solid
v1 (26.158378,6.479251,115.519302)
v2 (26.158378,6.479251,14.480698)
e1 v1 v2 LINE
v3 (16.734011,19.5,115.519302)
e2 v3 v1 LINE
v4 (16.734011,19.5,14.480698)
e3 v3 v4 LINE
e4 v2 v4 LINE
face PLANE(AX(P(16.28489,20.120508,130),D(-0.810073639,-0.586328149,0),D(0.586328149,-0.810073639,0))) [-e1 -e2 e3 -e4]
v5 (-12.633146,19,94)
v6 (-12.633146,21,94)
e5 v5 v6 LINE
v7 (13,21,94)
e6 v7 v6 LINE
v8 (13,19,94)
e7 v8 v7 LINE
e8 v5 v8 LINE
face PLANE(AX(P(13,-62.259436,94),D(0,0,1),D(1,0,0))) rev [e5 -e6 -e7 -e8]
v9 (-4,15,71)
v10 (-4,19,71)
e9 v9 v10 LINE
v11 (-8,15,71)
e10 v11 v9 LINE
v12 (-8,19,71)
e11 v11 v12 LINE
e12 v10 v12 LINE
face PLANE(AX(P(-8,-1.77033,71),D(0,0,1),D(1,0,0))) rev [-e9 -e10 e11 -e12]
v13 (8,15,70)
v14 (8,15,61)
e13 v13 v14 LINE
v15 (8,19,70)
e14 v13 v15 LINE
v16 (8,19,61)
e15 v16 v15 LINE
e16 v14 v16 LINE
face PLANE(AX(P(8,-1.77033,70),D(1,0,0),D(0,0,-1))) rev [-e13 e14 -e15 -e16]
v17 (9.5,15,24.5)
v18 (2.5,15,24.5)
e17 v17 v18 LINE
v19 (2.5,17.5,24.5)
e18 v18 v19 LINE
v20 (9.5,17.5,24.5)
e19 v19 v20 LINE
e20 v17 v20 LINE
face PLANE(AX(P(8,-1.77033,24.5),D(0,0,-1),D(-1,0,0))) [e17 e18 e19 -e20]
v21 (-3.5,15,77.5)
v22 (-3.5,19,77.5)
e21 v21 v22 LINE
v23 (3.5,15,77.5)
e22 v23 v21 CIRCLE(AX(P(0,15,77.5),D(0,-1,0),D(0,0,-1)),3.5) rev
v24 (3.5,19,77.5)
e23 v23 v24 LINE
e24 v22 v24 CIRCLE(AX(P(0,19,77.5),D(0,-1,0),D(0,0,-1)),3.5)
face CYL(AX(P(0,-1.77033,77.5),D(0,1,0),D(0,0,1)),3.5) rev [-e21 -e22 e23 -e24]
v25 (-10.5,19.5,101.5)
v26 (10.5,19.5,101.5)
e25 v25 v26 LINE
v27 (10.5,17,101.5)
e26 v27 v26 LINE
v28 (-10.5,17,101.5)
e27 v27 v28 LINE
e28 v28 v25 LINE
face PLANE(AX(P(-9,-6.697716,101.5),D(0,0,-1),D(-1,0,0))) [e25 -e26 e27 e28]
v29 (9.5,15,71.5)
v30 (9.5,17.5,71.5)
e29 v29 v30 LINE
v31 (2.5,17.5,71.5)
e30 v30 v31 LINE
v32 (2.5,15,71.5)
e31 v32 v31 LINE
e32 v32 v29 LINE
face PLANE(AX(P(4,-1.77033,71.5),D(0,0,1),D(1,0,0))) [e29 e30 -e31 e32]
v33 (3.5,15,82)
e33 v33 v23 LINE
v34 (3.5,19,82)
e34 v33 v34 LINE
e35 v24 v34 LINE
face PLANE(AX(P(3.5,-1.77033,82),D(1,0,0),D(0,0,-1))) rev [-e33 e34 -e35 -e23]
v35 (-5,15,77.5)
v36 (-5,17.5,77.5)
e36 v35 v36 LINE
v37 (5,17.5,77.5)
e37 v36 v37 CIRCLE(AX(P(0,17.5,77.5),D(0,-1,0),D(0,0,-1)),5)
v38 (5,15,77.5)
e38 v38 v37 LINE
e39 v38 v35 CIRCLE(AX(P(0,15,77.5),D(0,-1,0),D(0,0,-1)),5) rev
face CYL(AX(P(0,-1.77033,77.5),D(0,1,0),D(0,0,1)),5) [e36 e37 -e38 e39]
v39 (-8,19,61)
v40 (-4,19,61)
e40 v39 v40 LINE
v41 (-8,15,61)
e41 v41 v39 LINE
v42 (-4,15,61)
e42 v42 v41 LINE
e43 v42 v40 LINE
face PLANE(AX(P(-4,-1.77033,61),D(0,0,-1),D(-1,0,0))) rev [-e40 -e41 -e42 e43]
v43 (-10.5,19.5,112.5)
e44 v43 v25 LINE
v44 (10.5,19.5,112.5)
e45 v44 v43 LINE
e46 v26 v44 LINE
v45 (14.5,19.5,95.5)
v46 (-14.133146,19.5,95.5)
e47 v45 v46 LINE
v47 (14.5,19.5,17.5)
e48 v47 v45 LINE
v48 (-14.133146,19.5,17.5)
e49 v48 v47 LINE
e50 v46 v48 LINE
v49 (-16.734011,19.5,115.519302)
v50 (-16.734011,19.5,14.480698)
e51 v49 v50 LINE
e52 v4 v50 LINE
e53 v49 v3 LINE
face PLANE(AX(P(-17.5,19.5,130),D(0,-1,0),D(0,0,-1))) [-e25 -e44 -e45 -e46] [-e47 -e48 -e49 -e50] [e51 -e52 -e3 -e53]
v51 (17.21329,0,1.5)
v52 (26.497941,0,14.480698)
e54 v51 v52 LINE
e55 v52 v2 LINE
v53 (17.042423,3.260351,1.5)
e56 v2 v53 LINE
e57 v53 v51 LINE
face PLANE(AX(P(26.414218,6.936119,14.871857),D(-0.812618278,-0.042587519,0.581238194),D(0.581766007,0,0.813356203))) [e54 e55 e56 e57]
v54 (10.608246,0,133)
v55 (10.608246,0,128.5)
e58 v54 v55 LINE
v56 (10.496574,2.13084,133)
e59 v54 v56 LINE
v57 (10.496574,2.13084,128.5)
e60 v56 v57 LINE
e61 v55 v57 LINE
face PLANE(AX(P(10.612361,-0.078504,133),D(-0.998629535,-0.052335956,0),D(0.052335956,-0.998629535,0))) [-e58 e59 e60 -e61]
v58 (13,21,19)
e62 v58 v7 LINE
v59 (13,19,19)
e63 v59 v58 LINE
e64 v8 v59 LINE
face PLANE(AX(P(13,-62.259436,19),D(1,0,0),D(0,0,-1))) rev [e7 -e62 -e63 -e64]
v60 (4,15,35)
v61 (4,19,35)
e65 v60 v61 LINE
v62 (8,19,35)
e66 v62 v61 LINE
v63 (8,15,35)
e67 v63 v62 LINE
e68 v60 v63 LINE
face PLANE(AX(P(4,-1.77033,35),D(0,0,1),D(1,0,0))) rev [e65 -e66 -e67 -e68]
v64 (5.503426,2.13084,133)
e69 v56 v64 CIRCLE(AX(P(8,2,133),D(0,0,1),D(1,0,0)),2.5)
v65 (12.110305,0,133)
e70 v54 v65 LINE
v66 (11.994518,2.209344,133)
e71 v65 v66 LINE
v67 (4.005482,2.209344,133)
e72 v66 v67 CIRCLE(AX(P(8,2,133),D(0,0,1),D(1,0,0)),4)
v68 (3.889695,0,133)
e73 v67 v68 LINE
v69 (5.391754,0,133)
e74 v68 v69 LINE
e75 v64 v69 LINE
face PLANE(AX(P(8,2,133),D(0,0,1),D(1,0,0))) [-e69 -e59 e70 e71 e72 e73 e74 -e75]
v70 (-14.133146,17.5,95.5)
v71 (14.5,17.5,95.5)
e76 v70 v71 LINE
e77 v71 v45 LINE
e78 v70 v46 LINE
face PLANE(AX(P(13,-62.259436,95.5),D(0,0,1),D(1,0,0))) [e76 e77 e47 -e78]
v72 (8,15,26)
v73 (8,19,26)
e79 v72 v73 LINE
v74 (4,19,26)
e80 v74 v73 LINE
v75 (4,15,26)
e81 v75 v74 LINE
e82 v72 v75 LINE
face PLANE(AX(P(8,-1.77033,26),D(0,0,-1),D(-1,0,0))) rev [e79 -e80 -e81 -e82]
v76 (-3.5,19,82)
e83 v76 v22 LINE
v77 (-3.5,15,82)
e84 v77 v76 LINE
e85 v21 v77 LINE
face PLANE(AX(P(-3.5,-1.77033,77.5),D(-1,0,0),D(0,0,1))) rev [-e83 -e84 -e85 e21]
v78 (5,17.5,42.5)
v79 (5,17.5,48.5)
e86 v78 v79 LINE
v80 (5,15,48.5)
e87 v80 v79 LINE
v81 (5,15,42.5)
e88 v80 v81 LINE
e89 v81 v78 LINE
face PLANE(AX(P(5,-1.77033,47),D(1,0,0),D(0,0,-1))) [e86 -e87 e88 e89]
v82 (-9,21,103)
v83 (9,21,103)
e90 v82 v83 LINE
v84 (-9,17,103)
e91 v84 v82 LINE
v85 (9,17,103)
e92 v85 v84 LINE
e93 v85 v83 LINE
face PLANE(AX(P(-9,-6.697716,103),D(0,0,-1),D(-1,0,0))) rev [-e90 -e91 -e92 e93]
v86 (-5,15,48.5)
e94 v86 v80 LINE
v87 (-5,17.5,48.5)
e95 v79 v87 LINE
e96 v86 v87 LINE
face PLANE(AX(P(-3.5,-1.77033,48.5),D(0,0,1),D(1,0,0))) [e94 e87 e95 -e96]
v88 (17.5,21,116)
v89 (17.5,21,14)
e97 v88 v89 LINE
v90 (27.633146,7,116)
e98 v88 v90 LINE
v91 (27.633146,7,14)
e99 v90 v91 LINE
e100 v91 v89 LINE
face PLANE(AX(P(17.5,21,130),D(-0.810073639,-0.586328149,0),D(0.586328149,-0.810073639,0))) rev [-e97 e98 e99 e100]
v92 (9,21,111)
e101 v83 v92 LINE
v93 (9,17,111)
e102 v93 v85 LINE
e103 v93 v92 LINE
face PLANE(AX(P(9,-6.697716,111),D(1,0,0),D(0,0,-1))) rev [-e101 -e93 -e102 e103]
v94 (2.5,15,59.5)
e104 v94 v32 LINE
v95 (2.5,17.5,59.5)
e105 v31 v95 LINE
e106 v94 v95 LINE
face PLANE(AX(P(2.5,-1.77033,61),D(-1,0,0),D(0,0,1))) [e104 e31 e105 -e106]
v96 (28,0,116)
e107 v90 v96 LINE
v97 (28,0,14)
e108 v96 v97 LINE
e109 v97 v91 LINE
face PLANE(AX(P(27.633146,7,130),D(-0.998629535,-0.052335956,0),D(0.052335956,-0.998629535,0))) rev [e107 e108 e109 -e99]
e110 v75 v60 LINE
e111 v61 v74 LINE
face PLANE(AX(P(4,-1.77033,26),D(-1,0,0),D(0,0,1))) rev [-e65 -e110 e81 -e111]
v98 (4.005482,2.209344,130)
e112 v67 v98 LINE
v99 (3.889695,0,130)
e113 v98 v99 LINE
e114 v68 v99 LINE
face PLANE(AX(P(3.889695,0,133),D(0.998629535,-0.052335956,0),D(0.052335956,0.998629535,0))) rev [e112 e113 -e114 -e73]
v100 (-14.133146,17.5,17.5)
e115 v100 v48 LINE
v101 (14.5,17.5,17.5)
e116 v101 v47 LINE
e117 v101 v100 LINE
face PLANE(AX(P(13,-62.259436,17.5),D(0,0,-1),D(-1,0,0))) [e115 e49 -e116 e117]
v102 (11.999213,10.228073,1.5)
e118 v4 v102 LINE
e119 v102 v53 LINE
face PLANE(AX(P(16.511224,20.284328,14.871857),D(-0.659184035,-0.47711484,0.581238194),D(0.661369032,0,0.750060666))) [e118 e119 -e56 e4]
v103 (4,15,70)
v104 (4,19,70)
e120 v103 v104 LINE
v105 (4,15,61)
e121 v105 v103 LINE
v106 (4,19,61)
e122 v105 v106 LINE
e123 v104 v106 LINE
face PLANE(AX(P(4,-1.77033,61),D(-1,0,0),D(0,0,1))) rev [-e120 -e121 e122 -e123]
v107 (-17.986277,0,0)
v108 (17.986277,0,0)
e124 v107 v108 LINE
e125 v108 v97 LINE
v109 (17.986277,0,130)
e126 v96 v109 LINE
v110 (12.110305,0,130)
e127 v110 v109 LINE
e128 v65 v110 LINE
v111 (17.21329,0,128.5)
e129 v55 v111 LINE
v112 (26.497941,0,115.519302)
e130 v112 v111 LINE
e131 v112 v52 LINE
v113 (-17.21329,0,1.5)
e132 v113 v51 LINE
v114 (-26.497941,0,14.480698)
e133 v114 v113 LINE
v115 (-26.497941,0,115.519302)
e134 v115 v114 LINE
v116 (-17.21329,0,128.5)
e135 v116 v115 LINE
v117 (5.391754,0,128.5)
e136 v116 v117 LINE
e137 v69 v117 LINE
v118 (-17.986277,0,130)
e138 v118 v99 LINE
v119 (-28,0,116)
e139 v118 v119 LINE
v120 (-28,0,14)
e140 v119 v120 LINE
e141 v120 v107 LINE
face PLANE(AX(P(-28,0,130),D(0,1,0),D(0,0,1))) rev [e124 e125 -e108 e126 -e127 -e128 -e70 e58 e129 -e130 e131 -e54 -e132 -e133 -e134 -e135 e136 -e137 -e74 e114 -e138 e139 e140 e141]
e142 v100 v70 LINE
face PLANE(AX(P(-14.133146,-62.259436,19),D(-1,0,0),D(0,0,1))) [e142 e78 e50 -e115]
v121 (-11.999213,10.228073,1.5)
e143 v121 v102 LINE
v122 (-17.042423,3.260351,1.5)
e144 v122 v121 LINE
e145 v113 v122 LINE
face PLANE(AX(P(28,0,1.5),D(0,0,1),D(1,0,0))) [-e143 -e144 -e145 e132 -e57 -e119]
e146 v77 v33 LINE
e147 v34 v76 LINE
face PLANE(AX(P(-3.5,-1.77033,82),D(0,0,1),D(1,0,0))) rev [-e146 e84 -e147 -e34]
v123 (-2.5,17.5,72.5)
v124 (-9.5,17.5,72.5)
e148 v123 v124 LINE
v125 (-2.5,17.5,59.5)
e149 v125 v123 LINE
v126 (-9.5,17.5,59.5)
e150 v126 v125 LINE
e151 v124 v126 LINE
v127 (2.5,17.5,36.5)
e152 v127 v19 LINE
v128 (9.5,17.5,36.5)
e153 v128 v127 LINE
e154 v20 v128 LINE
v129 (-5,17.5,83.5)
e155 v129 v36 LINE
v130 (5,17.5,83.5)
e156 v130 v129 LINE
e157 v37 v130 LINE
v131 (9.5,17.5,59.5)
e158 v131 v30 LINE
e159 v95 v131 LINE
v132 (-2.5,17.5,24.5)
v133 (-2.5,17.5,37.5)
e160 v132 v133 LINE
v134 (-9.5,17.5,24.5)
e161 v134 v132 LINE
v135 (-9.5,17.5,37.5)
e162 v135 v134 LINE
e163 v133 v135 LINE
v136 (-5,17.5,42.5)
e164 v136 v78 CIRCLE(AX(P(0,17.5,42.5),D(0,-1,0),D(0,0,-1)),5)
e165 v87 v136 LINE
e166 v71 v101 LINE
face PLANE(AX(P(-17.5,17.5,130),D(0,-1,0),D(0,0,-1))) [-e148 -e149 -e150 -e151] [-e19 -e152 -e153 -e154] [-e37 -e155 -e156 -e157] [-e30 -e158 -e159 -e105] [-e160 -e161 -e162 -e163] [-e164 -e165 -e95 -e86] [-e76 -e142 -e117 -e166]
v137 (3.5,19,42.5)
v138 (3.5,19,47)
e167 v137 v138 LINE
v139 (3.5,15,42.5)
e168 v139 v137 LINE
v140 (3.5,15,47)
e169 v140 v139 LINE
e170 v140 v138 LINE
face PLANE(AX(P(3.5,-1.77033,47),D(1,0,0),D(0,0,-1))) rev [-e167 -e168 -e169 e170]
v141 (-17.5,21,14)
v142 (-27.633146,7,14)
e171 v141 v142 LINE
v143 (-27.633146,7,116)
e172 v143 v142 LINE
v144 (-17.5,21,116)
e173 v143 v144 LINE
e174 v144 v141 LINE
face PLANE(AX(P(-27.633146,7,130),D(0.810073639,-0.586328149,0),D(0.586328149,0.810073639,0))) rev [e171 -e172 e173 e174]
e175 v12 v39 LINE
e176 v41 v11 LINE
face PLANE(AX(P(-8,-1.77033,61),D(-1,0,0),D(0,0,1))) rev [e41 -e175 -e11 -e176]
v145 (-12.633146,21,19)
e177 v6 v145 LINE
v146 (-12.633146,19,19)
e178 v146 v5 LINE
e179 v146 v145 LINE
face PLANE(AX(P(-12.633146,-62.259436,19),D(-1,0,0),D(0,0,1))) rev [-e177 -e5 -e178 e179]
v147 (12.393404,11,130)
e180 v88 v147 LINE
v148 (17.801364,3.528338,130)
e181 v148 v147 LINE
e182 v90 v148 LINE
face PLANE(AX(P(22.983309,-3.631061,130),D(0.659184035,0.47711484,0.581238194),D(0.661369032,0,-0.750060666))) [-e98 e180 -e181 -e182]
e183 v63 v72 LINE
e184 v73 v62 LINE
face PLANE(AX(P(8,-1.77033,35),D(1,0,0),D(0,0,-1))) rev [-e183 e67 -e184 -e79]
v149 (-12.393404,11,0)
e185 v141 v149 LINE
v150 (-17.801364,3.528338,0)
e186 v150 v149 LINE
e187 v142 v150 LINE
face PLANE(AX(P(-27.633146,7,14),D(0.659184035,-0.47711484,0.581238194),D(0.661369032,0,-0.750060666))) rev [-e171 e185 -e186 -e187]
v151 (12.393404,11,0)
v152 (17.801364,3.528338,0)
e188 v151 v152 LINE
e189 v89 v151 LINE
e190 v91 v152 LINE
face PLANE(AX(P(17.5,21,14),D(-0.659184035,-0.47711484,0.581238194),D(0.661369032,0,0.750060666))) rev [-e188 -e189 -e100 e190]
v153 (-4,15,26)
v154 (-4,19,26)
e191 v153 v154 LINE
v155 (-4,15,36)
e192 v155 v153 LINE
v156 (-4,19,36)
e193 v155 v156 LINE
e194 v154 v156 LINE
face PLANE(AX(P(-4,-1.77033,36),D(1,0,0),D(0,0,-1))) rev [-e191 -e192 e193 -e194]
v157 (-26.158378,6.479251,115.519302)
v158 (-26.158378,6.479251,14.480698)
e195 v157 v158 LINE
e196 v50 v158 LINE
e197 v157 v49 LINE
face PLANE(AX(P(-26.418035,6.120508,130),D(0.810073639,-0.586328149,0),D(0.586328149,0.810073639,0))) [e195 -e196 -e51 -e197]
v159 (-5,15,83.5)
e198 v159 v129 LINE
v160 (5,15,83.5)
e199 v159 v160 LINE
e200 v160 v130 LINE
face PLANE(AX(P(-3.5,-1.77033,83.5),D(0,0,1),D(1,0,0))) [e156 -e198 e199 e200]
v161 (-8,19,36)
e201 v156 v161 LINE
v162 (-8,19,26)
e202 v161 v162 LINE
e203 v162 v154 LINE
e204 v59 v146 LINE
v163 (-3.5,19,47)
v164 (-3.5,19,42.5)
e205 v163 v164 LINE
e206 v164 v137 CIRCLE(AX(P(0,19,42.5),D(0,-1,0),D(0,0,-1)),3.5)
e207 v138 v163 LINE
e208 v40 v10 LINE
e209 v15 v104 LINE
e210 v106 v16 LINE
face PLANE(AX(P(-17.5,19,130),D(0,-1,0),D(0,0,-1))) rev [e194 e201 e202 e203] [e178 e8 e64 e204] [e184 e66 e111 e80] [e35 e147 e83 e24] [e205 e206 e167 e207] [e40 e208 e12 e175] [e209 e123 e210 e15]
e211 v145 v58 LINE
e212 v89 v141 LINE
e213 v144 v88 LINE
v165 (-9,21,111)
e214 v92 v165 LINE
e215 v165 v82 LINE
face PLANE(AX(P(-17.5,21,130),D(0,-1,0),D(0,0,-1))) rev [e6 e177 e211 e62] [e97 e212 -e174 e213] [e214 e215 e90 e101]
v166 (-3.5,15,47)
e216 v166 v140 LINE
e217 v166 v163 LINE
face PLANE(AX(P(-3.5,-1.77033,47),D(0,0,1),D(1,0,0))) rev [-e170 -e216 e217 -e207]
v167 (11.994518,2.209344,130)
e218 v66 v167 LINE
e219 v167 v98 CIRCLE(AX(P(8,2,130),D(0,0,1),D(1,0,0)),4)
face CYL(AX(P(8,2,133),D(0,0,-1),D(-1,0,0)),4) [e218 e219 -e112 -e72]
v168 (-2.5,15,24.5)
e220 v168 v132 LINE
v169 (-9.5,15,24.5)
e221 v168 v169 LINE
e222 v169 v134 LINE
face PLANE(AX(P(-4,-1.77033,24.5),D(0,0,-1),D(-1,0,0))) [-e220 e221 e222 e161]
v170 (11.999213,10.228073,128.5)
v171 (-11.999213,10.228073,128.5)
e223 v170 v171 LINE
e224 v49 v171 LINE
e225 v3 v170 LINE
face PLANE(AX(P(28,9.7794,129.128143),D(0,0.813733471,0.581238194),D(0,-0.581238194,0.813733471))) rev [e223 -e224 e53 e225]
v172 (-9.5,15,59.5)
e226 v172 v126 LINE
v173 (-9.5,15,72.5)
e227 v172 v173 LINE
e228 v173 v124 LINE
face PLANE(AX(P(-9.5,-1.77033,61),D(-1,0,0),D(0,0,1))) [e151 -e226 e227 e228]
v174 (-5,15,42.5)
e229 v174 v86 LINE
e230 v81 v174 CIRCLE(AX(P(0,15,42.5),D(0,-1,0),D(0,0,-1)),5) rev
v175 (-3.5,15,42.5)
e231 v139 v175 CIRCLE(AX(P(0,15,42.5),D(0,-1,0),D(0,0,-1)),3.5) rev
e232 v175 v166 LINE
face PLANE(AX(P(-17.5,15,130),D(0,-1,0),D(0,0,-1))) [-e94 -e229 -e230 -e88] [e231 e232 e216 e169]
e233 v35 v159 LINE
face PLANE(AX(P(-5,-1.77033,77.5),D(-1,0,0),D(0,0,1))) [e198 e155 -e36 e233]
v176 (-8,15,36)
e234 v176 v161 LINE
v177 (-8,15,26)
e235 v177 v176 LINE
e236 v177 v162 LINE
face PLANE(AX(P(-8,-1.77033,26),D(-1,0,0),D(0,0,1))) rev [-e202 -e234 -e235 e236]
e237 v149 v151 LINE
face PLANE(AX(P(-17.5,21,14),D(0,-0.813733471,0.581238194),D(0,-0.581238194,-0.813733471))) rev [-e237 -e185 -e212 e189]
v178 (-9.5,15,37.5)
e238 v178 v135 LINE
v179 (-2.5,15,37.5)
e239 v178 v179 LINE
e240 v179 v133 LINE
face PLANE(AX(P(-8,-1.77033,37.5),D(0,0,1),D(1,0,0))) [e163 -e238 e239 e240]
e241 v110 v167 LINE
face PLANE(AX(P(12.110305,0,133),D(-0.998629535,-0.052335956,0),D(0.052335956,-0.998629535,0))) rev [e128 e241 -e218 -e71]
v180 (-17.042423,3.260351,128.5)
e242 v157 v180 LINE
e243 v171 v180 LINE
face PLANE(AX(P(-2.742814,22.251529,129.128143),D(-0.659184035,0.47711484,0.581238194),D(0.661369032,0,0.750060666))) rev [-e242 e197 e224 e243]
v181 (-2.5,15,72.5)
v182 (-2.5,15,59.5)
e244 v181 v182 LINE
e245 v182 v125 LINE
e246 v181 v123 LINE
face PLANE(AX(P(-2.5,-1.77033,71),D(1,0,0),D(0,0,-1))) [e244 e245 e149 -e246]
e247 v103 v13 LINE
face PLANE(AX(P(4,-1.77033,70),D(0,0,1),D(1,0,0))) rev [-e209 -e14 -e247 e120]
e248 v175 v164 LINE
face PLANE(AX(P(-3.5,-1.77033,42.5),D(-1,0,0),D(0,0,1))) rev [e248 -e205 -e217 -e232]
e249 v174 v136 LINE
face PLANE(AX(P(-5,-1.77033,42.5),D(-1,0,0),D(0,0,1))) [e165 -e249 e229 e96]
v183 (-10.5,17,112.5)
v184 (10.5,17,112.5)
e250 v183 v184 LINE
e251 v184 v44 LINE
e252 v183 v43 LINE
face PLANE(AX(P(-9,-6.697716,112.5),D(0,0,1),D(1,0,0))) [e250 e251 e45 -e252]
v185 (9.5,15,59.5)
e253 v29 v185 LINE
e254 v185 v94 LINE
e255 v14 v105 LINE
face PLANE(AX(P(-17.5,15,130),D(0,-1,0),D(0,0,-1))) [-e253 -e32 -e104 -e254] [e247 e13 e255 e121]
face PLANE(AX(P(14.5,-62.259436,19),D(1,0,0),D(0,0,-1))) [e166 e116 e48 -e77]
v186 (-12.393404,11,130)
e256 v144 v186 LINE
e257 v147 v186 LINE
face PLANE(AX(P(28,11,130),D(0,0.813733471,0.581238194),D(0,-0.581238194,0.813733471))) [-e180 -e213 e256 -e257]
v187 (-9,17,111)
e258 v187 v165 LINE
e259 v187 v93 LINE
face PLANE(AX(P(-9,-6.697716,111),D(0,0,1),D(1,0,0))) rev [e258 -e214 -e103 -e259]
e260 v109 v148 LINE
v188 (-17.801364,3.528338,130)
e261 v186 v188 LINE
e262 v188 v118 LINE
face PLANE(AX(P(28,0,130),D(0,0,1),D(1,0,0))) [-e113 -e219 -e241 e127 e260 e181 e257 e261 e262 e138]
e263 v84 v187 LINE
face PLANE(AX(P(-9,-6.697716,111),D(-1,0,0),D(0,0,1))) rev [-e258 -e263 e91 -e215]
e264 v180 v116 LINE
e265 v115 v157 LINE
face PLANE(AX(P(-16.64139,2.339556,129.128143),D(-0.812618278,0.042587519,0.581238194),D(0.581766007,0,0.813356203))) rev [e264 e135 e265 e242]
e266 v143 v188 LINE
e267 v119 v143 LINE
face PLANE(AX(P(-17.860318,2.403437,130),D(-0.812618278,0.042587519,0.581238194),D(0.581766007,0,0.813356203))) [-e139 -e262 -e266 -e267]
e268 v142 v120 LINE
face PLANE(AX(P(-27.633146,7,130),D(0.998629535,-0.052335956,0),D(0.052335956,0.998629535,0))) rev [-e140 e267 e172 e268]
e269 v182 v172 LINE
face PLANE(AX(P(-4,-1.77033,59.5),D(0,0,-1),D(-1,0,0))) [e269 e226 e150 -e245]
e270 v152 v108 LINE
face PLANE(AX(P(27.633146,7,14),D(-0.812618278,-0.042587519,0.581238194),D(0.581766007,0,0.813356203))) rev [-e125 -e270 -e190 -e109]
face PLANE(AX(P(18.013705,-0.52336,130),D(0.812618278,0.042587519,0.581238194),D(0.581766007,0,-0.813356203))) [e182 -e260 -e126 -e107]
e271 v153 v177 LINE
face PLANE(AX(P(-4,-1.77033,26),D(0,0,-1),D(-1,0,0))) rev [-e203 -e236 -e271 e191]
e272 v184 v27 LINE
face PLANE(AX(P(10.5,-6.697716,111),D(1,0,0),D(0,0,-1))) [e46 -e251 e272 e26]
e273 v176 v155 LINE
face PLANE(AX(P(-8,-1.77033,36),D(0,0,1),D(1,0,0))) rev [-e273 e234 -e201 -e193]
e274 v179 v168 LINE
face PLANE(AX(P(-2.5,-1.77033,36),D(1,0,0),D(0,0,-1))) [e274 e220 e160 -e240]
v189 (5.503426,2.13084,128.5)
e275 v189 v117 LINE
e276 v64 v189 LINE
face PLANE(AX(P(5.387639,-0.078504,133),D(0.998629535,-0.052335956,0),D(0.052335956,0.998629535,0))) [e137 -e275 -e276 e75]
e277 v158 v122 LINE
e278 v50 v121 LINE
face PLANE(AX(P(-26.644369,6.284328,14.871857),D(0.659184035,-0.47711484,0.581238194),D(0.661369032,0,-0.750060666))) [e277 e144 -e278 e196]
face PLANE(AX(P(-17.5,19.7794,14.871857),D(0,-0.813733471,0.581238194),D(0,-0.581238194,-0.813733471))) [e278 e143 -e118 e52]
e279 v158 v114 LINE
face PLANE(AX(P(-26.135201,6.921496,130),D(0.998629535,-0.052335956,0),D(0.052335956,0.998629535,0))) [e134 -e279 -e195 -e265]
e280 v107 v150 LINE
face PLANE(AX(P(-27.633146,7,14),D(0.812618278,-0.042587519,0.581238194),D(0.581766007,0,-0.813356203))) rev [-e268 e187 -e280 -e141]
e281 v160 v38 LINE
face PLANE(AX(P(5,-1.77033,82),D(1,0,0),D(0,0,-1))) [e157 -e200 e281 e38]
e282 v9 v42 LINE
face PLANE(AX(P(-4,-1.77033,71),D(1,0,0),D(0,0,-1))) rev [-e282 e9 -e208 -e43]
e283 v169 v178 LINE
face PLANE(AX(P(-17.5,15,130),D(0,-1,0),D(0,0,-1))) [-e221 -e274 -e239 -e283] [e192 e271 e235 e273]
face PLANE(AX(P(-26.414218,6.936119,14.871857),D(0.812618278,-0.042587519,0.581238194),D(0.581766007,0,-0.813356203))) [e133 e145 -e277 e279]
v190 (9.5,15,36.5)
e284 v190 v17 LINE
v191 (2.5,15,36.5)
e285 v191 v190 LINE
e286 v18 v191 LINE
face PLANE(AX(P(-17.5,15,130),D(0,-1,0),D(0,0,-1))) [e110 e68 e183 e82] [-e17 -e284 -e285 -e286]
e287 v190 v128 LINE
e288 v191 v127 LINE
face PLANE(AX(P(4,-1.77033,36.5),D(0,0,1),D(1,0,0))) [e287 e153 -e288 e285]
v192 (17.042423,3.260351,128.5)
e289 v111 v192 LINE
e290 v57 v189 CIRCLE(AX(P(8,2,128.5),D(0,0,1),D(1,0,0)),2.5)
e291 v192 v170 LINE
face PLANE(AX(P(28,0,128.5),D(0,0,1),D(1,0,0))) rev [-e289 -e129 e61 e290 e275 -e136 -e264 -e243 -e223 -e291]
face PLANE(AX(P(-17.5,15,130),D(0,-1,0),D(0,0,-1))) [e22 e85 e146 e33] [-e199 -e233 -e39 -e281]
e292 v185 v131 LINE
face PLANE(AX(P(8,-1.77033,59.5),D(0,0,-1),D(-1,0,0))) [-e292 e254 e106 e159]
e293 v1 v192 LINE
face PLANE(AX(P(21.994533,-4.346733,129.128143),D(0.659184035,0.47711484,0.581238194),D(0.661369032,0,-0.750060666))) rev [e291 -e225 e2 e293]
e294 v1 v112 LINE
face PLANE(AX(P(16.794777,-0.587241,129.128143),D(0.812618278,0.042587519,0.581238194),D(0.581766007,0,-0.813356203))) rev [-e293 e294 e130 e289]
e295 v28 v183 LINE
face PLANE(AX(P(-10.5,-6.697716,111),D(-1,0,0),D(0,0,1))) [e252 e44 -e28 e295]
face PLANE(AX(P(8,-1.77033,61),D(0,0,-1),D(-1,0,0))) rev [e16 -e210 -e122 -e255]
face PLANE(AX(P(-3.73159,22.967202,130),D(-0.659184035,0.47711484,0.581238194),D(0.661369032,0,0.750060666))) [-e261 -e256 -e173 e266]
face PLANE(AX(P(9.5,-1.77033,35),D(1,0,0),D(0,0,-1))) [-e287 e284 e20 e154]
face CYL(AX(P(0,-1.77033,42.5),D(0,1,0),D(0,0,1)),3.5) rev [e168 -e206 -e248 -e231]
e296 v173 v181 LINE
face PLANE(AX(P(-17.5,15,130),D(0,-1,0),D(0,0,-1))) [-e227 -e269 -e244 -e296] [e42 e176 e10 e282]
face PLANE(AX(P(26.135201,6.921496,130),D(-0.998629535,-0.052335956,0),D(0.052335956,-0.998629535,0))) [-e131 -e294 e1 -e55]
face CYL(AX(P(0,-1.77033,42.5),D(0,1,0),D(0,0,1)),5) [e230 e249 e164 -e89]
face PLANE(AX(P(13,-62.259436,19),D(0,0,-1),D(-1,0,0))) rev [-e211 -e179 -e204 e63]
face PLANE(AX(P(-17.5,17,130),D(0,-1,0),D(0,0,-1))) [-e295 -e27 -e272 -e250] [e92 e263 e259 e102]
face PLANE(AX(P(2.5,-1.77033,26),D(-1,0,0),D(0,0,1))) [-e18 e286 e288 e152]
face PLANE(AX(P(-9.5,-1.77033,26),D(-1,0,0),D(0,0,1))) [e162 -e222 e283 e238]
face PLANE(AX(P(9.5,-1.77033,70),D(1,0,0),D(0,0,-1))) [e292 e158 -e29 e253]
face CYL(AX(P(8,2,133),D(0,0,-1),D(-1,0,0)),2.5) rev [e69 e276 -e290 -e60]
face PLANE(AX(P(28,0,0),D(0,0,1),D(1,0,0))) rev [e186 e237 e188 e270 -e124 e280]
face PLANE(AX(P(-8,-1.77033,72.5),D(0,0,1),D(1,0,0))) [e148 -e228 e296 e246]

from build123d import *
from OCP.BRepFilletAPI import BRepFilletAPI_MakeChamfer

# Parameters (mm, degrees)
EXTRUDE1_DEPTH       = 130
CHAMFER1_SIZE        = 14
CHAMFER1_SIZE2       = 10
CHAMFER2_SIZE        = 10
CHAMFER2_SIZE2       = 14
EXTRUDE2_DEPTH       = 3
SKETCH3_W            = 25.633145545
SKETCH3_H            = 75
CUT_EXTRUDE1_DEPTH   = 11
SKETCH4_W            = 4
SKETCH4_H            = 9
SKETCH4_H_2          = 10
CUT_EXTRUDE2_DEPTH   = 15
LPATTERN1_COUNT      = 2
LPATTERN1_PITCH      = 35
SKETCH5_W            = 18
SKETCH5_H            = 8
CUT_EXTRUDE3_DEPTH   = 13
SHELL1_OUTLINE_W     = 28.633145545
SHELL1_OUTLINE_H     = 78
SHELL1_OUTLINE_W_2   = 21
SHELL1_OUTLINE_H_2   = 11
SHELL1_DEPTH         = 15
SHELL1_START         = 15
SHELL1_2_OUTLINE_W   = 28.633145545
SHELL1_2_OUTLINE_H   = 78
SHELL1_2_OUTLINE_W_2 = 7
SHELL1_2_OUTLINE_H_2 = 13
SHELL1_2_OUTLINE_H_3 = 12
SHELL1_2_DEPTH       = 2.5
SHELL1_3_OUTLINE_W   = 21
SHELL1_3_OUTLINE_H   = 11
SHELL1_3_DEPTH       = 2
SHELL1_START_2       = 14.48069758
SHELL1_4_DEPTH       = 101.03860484
SHELL1_START_3       = 95.5
SHELL1_5_DEPTH       = 6
SHELL1_START_4       = 101.5
SHELL1_6_OUTLINE_W   = 3.633145545
SHELL1_6_OUTLINE_H   = 19.5
SHELL1_6_DEPTH       = 14.01930242
SHELL1_7_DEPTH       = 3.01930242
SHELL1_START_5       = 112.5
SHELL1_8_DEPTH       = 3.01930242
SHELL1_START_6       = 1.5
SHELL1_9_DEPTH       = 131.5


with BuildPart() as part:
    # Sketch1 → Extrude1 (new body)
    with BuildSketch(Plane.XY):
        Polygon((17.5, 21), (27.633145545, 7), (28, 0), (-28, 0), (-27.633145545, 7), (-17.5, 21), align=None)
    extrude(amount=EXTRUDE1_DEPTH)

    # Chamfer1: one chamfer whose edges measure the first distance from different faces: ONE call of the kernel's chamfer builder (chamfer() names one face for all edges)
    chamfer1_edges_1 = [part.edges().sort_by_distance(p)[0] for p in [
        (0, 21, 130),
    ]]
    chamfer1_side_1 = [part.faces().sort_by_distance(p)[0] for p in [
        (0, 21, 65),
    ]]
    chamfer1_edges_2 = [part.edges().sort_by_distance(p)[0] for p in [
        (-22.566572773, 14, 130),
    ]]
    chamfer1_side_2 = [part.faces().sort_by_distance(p)[0] for p in [
        (-22.566572773, 14, 65),
    ]]
    chamfer1_edges_3 = [part.edges().sort_by_distance(p)[0] for p in [
        (-27.816572773, 3.5, 130),
    ]]
    chamfer1_side_3 = [part.faces().sort_by_distance(p)[0] for p in [
        (-27.816572773, 3.5, 65),
    ]]
    chamfer1_edges_4 = [part.edges().sort_by_distance(p)[0] for p in [
        (27.816572773, 3.5, 130),
    ]]
    chamfer1_side_4 = [part.faces().sort_by_distance(p)[0] for p in [
        (27.816572773, 3.5, 65),
    ]]
    chamfer1_edges_5 = [part.edges().sort_by_distance(p)[0] for p in [
        (22.566572773, 14, 130),
    ]]
    chamfer1_side_5 = [part.faces().sort_by_distance(p)[0] for p in [
        (22.566572773, 14, 65),
    ]]
    chamfer1 = BRepFilletAPI_MakeChamfer(part.part.solid().wrapped)
    for e in chamfer1_edges_1:
        chamfer1.Add(CHAMFER1_SIZE, CHAMFER1_SIZE2, e.wrapped, chamfer1_side_1[0].wrapped)  # the first distance lies on this face
    for e in chamfer1_edges_2:
        chamfer1.Add(CHAMFER1_SIZE, CHAMFER1_SIZE2, e.wrapped, chamfer1_side_2[0].wrapped)  # the first distance lies on this face
    for e in chamfer1_edges_3:
        chamfer1.Add(CHAMFER1_SIZE, CHAMFER1_SIZE2, e.wrapped, chamfer1_side_3[0].wrapped)  # the first distance lies on this face
    for e in chamfer1_edges_4:
        chamfer1.Add(CHAMFER1_SIZE, CHAMFER1_SIZE2, e.wrapped, chamfer1_side_4[0].wrapped)  # the first distance lies on this face
    for e in chamfer1_edges_5:
        chamfer1.Add(CHAMFER1_SIZE, CHAMFER1_SIZE2, e.wrapped, chamfer1_side_5[0].wrapped)  # the first distance lies on this face
    add(Compound.cast(chamfer1.Shape()), mode=Mode.REPLACE)

    # Chamfer2
    chamfer2_edges = [part.edges().sort_by_distance(p)[0] for p in [
        (-27.816572773, 3.5, 0),
        (-22.566572773, 14, 0),
        (0, 21, 0),
        (22.566572773, 14, 0),
        (27.816572773, 3.5, 0),
    ]]
    chamfer2_side = [part.faces().sort_by_distance(p)[0] for p in [
        (0, 9.6691811, 0),
    ]]
    chamfer(chamfer2_edges, length=CHAMFER2_SIZE, length2=CHAMFER2_SIZE2, reference=chamfer2_side[0])

    # Sketch2 → Extrude2 (add)
    with BuildSketch(Plane(origin=(5.745184329, -1.894827458, 130), x_dir=(1, 0, 0), z_dir=(0, 0, 1))):
        with BuildLine():
            Line((-1.855489271, 1.894827458), (6.365120614, 1.894827458))
            Line((6.365120614, 1.894827458), (6.24933381, 4.104171283))
            ThreePointArc((6.24933381, 4.104171283), (2.254815671, 7.894827458), (-1.739702468, 4.104171283))
            Line((-1.739702468, 4.104171283), (-1.855489271, 1.894827458))
        make_face()
    extrude(amount=EXTRUDE2_DEPTH)

    # Sketch3 → Cut-Extrude1 (cut)
    with BuildSketch(Plane(origin=(3.492514123, 30, 107.578199621), x_dir=(1, 0, 0), z_dir=(0, 1, 0))):
        with Locations((-3.309086896, 51.078199621)):
            Rectangle(SKETCH3_W, SKETCH3_H)
    extrude(amount=-CUT_EXTRUDE1_DEPTH, mode=Mode.SUBTRACT)

    # Sketch4 → Cut-Extrude2 (cut)
    with BuildSketch(Plane(origin=(-3.08260661, 30, 40.468913064), x_dir=(-1, 0, 0), z_dir=(0, 1, 0))):
        with Locations((-9.08260661, -9.968913064)):
            Rectangle(SKETCH4_W, SKETCH4_H)
        with Locations((2.91739339, -9.468913064)):
            Rectangle(SKETCH4_W, SKETCH4_H_2)
        with BuildLine():
            Line((-6.58260661, 6.531086936), (-6.58260661, 2.031086936))
            ThreePointArc((-6.58260661, 2.031086936), (-3.08260661, -1.468913064), (0.41739339, 2.031086936))
            Line((0.41739339, 2.031086936), (0.41739339, 6.531086936))
            Line((0.41739339, 6.531086936), (-6.58260661, 6.531086936))
        make_face()
    cut_extrude2 = extrude(amount=-CUT_EXTRUDE2_DEPTH, mode=Mode.SUBTRACT)

    # LPattern1: Cut-Extrude2 ×2
    with Locations(*[(0, 0, i * LPATTERN1_PITCH) for i in range(1, LPATTERN1_COUNT)]):
        add(cut_extrude2, mode=Mode.SUBTRACT)

    # Sketch5 → Cut-Extrude3 (cut)
    with BuildSketch(Plane(origin=(0.792567218, 30, 213.513140982), x_dir=(1, 0, 0), z_dir=(0, 1, 0))):
        with Locations((-0.792567218, 106.513140982)):
            Rectangle(SKETCH5_W, SKETCH5_H)
    extrude(amount=-CUT_EXTRUDE3_DEPTH, mode=Mode.SUBTRACT)

    # Shell1: read off the stored shape, not the designer's step
    # Shell1 outline → Shell1 (cut)
    with BuildSketch(Plane(origin=(0, 0, 0), x_dir=(1, 0, 0), z_dir=(0, 1, 0))):
        with Locations((0.183427228, -56.5)):
            Rectangle(SHELL1_OUTLINE_W, SHELL1_OUTLINE_H)
        with Locations((0, -107)):
            Rectangle(SHELL1_OUTLINE_W_2, SHELL1_OUTLINE_H_2)
    extrude(amount=SHELL1_DEPTH, mode=Mode.SUBTRACT)

    # Shell1 2 outline → Shell1 2 (cut)
    with BuildSketch(Plane(origin=(0, 0, 0), x_dir=(1, 0, 0), z_dir=(0, 1, 0)).offset(SHELL1_START)):
        with Locations((0.183427228, -56.5)):
            Rectangle(SHELL1_2_OUTLINE_W, SHELL1_2_OUTLINE_H)
        with BuildLine():
            Line((-5, -83.5), (-5, -77.5))
            ThreePointArc((-5, -77.5), (0, -72.5), (5, -77.5))
            Line((5, -77.5), (5, -83.5))
            Line((5, -83.5), (-5, -83.5))
        make_face(mode=Mode.SUBTRACT)
        with Locations((-6, -66)):
            Rectangle(SHELL1_2_OUTLINE_W_2, SHELL1_2_OUTLINE_H_2, mode=Mode.SUBTRACT)
        with Locations((6, -65.5)):
            Rectangle(SHELL1_2_OUTLINE_W_2, SHELL1_2_OUTLINE_H_3, mode=Mode.SUBTRACT)
        with BuildLine():
            Line((-5, -48.5), (-5, -42.5))
            ThreePointArc((-5, -42.5), (0, -37.5), (5, -42.5))
            Line((5, -42.5), (5, -48.5))
            Line((5, -48.5), (-5, -48.5))
        make_face(mode=Mode.SUBTRACT)
        with Locations((-6, -31)):
            Rectangle(SHELL1_2_OUTLINE_W_2, SHELL1_2_OUTLINE_H_2, mode=Mode.SUBTRACT)
        with Locations((6, -30.5)):
            Rectangle(SHELL1_2_OUTLINE_W_2, SHELL1_2_OUTLINE_H_3, mode=Mode.SUBTRACT)
    extrude(amount=SHELL1_2_DEPTH, mode=Mode.SUBTRACT)

    # Shell1 3 outline → Shell1 3 (cut)
    with BuildSketch(Plane(origin=(0, 0, 0), x_dir=(1, 0, 0), z_dir=(0, 1, 0)).offset(SHELL1_START)):
        with Locations((0, -107)):
            Rectangle(SHELL1_3_OUTLINE_W, SHELL1_3_OUTLINE_H)
    extrude(amount=SHELL1_3_DEPTH, mode=Mode.SUBTRACT)

    # Shell1 4 outline → Shell1 4 (cut)
    with BuildSketch(Plane.XY.offset(SHELL1_START_2)):
        Polygon((26.497941481, 0), (26.158378339, 6.479250719), (16.734010656, 19.5), (14.5, 19.5), (14.5, 0), align=None)
        with BuildLine():
            Line((10.608246424, 0), (10.496573837, 2.130839891))
            ThreePointArc((10.496573837, 2.130839891), (8, 4.5), (5.503426163, 2.130839891))
            Line((5.503426163, 2.130839891), (5.391753576, 0))
            Line((5.391753576, 0), (10.608246424, 0))
        make_face()
        Polygon((-14.133145545, 0), (-14.133145545, 19.5), (-16.734010656, 19.5), (-26.158378339, 6.479250719), (-26.497941481, 0), align=None)
    extrude(amount=SHELL1_4_DEPTH, mode=Mode.SUBTRACT)

    # Shell1 5 outline → Shell1 5 (cut)
    with BuildSketch(Plane.XY.offset(SHELL1_START_3)):
        with BuildLine():
            Line((10.608246424, 0), (14.5, 0))
            Line((14.5, 0), (14.5, 19.5))
            Line((14.5, 19.5), (-14.133145545, 19.5))
            Line((-14.133145545, 19.5), (-14.133145545, 0))
            Line((-14.133145545, 0), (5.391753576, 0))
            Line((5.391753576, 0), (5.503426163, 2.130839891))
            ThreePointArc((5.503426163, 2.130839891), (8, 4.5), (10.496573837, 2.130839891))
            Line((10.496573837, 2.130839891), (10.608246424, 0))
        make_face()
    extrude(amount=SHELL1_5_DEPTH, mode=Mode.SUBTRACT)

    # Shell1 6 outline → Shell1 6 (cut)
    with BuildSketch(Plane.XY.offset(SHELL1_START_4)):
        Polygon((10.608246424, 0), (14.5, 0), (14.5, 19.5), (10.5, 19.5), (10.5, 2.065464807), align=None)
        with Locations((-12.316572773, 9.75)):
            Rectangle(SHELL1_6_OUTLINE_W, SHELL1_6_OUTLINE_H)
    extrude(amount=SHELL1_6_DEPTH, mode=Mode.SUBTRACT)

    # Shell1 7 outline → Shell1 7 (cut)
    with BuildSketch(Plane.XY.offset(SHELL1_START_2)):
        with BuildLine():
            Line((10.608246424, 0), (14.5, 0))
            Line((14.5, 0), (14.5, 19.5))
            Line((14.5, 19.5), (-14.133145545, 19.5))
            Line((-14.133145545, 19.5), (-14.133145545, 0))
            Line((-14.133145545, 0), (5.391753576, 0))
            Line((5.391753576, 0), (5.503426163, 2.130839891))
            ThreePointArc((5.503426163, 2.130839891), (8, 4.5), (10.496573837, 2.130839891))
            Line((10.496573837, 2.130839891), (10.608246424, 0))
        make_face()
    extrude(amount=SHELL1_7_DEPTH, mode=Mode.SUBTRACT)

    # Shell1 8 outline → Shell1 8 (cut)
    with BuildSketch(Plane.XY.offset(SHELL1_START_5)):
        with BuildLine():
            Line((10.5, 2.065464807), (10.5, 19.5))
            Line((10.5, 19.5), (-10.5, 19.5))
            Line((-10.5, 19.5), (-10.5, 0))
            Line((-10.5, 0), (5.391753576, 0))
            Line((5.391753576, 0), (5.503426163, 2.130839891))
            ThreePointArc((5.503426163, 2.130839891), (8, 4.5), (10.496573837, 2.130839891))
            Line((10.496573837, 2.130839891), (10.5, 2.065464807))
        make_face()
    extrude(amount=SHELL1_8_DEPTH, mode=Mode.SUBTRACT)

    # Shell1 9 outline → Shell1 9 (cut)
    with BuildSketch(Plane.XY.offset(SHELL1_START_6)):
        with BuildLine():
            Line((10.608246424, 0), (10.496573837, 2.130839891))
            ThreePointArc((10.496573837, 2.130839891), (8, 4.5), (5.503426163, 2.130839891))
            Line((5.503426163, 2.130839891), (5.391753576, 0))
            Line((5.391753576, 0), (10.608246424, 0))
        make_face()
    extrude(amount=SHELL1_9_DEPTH, mode=Mode.SUBTRACT)

    # Shell1 10: loft between two sections, ruled curve by curve
    shell1_10_from = [
        Edge.make_line((-26.497941481, 0, 115.51930242), (-26.158378339, 6.479250719, 115.51930242)),
        Edge.make_line((-26.158378339, 6.479250719, 115.51930242), (-16.734010656, 19.5, 115.51930242)),
        Edge.make_line((-16.734010656, 19.5, 115.51930242), (16.734010656, 19.5, 115.51930242)),
        Edge.make_line((16.734010656, 19.5, 115.51930242), (26.158378339, 6.479250719, 115.51930242)),
        Edge.make_line((26.497941481, 0, 115.51930242), (26.158378339, 6.479250719, 115.51930242)),
        Edge.make_line((26.497941481, 0, 115.51930242), (-26.497941481, 0, 115.51930242)),
    ]
    shell1_10_to = [
        Edge.make_line((-17.213290346, 0, 128.5), (-17.042422579, 3.260351225, 128.5)),
        Edge.make_line((-17.042422579, 3.260351225, 128.5), (-11.999212546, 10.228073157, 128.5)),
        Edge.make_line((-11.999212546, 10.228073157, 128.5), (11.999212546, 10.228073157, 128.5)),
        Edge.make_line((11.999212546, 10.228073157, 128.5), (17.042422579, 3.260351225, 128.5)),
        Edge.make_line((17.213290346, 0, 128.5), (17.042422579, 3.260351225, 128.5)),
        Edge.make_line((17.213290346, 0, 128.5), (-17.213290346, 0, 128.5)),
    ]
    shell1_10 = Solid(Shell([*[Face.make_surface_from_curves(shell1_10_from[k], shell1_10_to[k]) for k in range(6)], Face(Wire(shell1_10_from)), Face(Wire(shell1_10_to))]))
    add(shell1_10, mode=Mode.SUBTRACT)

    # Shell1 11: loft between two sections, ruled curve by curve
    shell1_11_from = [
        Edge.make_line((17.213290346, 0, 1.5), (17.042422579, 3.260351225, 1.5)),
        Edge.make_line((17.042422579, 3.260351225, 1.5), (11.999212546, 10.228073157, 1.5)),
        Edge.make_line((11.999212546, 10.228073157, 1.5), (-11.999212546, 10.228073157, 1.5)),
        Edge.make_line((-11.999212546, 10.228073157, 1.5), (-17.042422579, 3.260351225, 1.5)),
        Edge.make_line((-17.042422579, 3.260351225, 1.5), (-17.213290346, 0, 1.5)),
        Edge.make_line((-17.213290346, 0, 1.5), (17.213290346, 0, 1.5)),
    ]
    shell1_11_to = [
        Edge.make_line((26.497941481, 0, 14.48069758), (26.158378339, 6.479250719, 14.48069758)),
        Edge.make_line((26.158378339, 6.479250719, 14.48069758), (16.734010656, 19.5, 14.48069758)),
        Edge.make_line((16.734010656, 19.5, 14.48069758), (-16.734010656, 19.5, 14.48069758)),
        Edge.make_line((-16.734010656, 19.5, 14.48069758), (-26.158378339, 6.479250719, 14.48069758)),
        Edge.make_line((-26.158378339, 6.479250719, 14.48069758), (-26.497941481, 0, 14.48069758)),
        Edge.make_line((-26.497941481, 0, 14.48069758), (26.497941481, 0, 14.48069758)),
    ]
    shell1_11 = Solid(Shell([*[Face.make_surface_from_curves(shell1_11_from[k], shell1_11_to[k]) for k in range(6)], Face(Wire(shell1_11_from)), Face(Wire(shell1_11_to))]))
    add(shell1_11, mode=Mode.SUBTRACT)


solid = part.part
